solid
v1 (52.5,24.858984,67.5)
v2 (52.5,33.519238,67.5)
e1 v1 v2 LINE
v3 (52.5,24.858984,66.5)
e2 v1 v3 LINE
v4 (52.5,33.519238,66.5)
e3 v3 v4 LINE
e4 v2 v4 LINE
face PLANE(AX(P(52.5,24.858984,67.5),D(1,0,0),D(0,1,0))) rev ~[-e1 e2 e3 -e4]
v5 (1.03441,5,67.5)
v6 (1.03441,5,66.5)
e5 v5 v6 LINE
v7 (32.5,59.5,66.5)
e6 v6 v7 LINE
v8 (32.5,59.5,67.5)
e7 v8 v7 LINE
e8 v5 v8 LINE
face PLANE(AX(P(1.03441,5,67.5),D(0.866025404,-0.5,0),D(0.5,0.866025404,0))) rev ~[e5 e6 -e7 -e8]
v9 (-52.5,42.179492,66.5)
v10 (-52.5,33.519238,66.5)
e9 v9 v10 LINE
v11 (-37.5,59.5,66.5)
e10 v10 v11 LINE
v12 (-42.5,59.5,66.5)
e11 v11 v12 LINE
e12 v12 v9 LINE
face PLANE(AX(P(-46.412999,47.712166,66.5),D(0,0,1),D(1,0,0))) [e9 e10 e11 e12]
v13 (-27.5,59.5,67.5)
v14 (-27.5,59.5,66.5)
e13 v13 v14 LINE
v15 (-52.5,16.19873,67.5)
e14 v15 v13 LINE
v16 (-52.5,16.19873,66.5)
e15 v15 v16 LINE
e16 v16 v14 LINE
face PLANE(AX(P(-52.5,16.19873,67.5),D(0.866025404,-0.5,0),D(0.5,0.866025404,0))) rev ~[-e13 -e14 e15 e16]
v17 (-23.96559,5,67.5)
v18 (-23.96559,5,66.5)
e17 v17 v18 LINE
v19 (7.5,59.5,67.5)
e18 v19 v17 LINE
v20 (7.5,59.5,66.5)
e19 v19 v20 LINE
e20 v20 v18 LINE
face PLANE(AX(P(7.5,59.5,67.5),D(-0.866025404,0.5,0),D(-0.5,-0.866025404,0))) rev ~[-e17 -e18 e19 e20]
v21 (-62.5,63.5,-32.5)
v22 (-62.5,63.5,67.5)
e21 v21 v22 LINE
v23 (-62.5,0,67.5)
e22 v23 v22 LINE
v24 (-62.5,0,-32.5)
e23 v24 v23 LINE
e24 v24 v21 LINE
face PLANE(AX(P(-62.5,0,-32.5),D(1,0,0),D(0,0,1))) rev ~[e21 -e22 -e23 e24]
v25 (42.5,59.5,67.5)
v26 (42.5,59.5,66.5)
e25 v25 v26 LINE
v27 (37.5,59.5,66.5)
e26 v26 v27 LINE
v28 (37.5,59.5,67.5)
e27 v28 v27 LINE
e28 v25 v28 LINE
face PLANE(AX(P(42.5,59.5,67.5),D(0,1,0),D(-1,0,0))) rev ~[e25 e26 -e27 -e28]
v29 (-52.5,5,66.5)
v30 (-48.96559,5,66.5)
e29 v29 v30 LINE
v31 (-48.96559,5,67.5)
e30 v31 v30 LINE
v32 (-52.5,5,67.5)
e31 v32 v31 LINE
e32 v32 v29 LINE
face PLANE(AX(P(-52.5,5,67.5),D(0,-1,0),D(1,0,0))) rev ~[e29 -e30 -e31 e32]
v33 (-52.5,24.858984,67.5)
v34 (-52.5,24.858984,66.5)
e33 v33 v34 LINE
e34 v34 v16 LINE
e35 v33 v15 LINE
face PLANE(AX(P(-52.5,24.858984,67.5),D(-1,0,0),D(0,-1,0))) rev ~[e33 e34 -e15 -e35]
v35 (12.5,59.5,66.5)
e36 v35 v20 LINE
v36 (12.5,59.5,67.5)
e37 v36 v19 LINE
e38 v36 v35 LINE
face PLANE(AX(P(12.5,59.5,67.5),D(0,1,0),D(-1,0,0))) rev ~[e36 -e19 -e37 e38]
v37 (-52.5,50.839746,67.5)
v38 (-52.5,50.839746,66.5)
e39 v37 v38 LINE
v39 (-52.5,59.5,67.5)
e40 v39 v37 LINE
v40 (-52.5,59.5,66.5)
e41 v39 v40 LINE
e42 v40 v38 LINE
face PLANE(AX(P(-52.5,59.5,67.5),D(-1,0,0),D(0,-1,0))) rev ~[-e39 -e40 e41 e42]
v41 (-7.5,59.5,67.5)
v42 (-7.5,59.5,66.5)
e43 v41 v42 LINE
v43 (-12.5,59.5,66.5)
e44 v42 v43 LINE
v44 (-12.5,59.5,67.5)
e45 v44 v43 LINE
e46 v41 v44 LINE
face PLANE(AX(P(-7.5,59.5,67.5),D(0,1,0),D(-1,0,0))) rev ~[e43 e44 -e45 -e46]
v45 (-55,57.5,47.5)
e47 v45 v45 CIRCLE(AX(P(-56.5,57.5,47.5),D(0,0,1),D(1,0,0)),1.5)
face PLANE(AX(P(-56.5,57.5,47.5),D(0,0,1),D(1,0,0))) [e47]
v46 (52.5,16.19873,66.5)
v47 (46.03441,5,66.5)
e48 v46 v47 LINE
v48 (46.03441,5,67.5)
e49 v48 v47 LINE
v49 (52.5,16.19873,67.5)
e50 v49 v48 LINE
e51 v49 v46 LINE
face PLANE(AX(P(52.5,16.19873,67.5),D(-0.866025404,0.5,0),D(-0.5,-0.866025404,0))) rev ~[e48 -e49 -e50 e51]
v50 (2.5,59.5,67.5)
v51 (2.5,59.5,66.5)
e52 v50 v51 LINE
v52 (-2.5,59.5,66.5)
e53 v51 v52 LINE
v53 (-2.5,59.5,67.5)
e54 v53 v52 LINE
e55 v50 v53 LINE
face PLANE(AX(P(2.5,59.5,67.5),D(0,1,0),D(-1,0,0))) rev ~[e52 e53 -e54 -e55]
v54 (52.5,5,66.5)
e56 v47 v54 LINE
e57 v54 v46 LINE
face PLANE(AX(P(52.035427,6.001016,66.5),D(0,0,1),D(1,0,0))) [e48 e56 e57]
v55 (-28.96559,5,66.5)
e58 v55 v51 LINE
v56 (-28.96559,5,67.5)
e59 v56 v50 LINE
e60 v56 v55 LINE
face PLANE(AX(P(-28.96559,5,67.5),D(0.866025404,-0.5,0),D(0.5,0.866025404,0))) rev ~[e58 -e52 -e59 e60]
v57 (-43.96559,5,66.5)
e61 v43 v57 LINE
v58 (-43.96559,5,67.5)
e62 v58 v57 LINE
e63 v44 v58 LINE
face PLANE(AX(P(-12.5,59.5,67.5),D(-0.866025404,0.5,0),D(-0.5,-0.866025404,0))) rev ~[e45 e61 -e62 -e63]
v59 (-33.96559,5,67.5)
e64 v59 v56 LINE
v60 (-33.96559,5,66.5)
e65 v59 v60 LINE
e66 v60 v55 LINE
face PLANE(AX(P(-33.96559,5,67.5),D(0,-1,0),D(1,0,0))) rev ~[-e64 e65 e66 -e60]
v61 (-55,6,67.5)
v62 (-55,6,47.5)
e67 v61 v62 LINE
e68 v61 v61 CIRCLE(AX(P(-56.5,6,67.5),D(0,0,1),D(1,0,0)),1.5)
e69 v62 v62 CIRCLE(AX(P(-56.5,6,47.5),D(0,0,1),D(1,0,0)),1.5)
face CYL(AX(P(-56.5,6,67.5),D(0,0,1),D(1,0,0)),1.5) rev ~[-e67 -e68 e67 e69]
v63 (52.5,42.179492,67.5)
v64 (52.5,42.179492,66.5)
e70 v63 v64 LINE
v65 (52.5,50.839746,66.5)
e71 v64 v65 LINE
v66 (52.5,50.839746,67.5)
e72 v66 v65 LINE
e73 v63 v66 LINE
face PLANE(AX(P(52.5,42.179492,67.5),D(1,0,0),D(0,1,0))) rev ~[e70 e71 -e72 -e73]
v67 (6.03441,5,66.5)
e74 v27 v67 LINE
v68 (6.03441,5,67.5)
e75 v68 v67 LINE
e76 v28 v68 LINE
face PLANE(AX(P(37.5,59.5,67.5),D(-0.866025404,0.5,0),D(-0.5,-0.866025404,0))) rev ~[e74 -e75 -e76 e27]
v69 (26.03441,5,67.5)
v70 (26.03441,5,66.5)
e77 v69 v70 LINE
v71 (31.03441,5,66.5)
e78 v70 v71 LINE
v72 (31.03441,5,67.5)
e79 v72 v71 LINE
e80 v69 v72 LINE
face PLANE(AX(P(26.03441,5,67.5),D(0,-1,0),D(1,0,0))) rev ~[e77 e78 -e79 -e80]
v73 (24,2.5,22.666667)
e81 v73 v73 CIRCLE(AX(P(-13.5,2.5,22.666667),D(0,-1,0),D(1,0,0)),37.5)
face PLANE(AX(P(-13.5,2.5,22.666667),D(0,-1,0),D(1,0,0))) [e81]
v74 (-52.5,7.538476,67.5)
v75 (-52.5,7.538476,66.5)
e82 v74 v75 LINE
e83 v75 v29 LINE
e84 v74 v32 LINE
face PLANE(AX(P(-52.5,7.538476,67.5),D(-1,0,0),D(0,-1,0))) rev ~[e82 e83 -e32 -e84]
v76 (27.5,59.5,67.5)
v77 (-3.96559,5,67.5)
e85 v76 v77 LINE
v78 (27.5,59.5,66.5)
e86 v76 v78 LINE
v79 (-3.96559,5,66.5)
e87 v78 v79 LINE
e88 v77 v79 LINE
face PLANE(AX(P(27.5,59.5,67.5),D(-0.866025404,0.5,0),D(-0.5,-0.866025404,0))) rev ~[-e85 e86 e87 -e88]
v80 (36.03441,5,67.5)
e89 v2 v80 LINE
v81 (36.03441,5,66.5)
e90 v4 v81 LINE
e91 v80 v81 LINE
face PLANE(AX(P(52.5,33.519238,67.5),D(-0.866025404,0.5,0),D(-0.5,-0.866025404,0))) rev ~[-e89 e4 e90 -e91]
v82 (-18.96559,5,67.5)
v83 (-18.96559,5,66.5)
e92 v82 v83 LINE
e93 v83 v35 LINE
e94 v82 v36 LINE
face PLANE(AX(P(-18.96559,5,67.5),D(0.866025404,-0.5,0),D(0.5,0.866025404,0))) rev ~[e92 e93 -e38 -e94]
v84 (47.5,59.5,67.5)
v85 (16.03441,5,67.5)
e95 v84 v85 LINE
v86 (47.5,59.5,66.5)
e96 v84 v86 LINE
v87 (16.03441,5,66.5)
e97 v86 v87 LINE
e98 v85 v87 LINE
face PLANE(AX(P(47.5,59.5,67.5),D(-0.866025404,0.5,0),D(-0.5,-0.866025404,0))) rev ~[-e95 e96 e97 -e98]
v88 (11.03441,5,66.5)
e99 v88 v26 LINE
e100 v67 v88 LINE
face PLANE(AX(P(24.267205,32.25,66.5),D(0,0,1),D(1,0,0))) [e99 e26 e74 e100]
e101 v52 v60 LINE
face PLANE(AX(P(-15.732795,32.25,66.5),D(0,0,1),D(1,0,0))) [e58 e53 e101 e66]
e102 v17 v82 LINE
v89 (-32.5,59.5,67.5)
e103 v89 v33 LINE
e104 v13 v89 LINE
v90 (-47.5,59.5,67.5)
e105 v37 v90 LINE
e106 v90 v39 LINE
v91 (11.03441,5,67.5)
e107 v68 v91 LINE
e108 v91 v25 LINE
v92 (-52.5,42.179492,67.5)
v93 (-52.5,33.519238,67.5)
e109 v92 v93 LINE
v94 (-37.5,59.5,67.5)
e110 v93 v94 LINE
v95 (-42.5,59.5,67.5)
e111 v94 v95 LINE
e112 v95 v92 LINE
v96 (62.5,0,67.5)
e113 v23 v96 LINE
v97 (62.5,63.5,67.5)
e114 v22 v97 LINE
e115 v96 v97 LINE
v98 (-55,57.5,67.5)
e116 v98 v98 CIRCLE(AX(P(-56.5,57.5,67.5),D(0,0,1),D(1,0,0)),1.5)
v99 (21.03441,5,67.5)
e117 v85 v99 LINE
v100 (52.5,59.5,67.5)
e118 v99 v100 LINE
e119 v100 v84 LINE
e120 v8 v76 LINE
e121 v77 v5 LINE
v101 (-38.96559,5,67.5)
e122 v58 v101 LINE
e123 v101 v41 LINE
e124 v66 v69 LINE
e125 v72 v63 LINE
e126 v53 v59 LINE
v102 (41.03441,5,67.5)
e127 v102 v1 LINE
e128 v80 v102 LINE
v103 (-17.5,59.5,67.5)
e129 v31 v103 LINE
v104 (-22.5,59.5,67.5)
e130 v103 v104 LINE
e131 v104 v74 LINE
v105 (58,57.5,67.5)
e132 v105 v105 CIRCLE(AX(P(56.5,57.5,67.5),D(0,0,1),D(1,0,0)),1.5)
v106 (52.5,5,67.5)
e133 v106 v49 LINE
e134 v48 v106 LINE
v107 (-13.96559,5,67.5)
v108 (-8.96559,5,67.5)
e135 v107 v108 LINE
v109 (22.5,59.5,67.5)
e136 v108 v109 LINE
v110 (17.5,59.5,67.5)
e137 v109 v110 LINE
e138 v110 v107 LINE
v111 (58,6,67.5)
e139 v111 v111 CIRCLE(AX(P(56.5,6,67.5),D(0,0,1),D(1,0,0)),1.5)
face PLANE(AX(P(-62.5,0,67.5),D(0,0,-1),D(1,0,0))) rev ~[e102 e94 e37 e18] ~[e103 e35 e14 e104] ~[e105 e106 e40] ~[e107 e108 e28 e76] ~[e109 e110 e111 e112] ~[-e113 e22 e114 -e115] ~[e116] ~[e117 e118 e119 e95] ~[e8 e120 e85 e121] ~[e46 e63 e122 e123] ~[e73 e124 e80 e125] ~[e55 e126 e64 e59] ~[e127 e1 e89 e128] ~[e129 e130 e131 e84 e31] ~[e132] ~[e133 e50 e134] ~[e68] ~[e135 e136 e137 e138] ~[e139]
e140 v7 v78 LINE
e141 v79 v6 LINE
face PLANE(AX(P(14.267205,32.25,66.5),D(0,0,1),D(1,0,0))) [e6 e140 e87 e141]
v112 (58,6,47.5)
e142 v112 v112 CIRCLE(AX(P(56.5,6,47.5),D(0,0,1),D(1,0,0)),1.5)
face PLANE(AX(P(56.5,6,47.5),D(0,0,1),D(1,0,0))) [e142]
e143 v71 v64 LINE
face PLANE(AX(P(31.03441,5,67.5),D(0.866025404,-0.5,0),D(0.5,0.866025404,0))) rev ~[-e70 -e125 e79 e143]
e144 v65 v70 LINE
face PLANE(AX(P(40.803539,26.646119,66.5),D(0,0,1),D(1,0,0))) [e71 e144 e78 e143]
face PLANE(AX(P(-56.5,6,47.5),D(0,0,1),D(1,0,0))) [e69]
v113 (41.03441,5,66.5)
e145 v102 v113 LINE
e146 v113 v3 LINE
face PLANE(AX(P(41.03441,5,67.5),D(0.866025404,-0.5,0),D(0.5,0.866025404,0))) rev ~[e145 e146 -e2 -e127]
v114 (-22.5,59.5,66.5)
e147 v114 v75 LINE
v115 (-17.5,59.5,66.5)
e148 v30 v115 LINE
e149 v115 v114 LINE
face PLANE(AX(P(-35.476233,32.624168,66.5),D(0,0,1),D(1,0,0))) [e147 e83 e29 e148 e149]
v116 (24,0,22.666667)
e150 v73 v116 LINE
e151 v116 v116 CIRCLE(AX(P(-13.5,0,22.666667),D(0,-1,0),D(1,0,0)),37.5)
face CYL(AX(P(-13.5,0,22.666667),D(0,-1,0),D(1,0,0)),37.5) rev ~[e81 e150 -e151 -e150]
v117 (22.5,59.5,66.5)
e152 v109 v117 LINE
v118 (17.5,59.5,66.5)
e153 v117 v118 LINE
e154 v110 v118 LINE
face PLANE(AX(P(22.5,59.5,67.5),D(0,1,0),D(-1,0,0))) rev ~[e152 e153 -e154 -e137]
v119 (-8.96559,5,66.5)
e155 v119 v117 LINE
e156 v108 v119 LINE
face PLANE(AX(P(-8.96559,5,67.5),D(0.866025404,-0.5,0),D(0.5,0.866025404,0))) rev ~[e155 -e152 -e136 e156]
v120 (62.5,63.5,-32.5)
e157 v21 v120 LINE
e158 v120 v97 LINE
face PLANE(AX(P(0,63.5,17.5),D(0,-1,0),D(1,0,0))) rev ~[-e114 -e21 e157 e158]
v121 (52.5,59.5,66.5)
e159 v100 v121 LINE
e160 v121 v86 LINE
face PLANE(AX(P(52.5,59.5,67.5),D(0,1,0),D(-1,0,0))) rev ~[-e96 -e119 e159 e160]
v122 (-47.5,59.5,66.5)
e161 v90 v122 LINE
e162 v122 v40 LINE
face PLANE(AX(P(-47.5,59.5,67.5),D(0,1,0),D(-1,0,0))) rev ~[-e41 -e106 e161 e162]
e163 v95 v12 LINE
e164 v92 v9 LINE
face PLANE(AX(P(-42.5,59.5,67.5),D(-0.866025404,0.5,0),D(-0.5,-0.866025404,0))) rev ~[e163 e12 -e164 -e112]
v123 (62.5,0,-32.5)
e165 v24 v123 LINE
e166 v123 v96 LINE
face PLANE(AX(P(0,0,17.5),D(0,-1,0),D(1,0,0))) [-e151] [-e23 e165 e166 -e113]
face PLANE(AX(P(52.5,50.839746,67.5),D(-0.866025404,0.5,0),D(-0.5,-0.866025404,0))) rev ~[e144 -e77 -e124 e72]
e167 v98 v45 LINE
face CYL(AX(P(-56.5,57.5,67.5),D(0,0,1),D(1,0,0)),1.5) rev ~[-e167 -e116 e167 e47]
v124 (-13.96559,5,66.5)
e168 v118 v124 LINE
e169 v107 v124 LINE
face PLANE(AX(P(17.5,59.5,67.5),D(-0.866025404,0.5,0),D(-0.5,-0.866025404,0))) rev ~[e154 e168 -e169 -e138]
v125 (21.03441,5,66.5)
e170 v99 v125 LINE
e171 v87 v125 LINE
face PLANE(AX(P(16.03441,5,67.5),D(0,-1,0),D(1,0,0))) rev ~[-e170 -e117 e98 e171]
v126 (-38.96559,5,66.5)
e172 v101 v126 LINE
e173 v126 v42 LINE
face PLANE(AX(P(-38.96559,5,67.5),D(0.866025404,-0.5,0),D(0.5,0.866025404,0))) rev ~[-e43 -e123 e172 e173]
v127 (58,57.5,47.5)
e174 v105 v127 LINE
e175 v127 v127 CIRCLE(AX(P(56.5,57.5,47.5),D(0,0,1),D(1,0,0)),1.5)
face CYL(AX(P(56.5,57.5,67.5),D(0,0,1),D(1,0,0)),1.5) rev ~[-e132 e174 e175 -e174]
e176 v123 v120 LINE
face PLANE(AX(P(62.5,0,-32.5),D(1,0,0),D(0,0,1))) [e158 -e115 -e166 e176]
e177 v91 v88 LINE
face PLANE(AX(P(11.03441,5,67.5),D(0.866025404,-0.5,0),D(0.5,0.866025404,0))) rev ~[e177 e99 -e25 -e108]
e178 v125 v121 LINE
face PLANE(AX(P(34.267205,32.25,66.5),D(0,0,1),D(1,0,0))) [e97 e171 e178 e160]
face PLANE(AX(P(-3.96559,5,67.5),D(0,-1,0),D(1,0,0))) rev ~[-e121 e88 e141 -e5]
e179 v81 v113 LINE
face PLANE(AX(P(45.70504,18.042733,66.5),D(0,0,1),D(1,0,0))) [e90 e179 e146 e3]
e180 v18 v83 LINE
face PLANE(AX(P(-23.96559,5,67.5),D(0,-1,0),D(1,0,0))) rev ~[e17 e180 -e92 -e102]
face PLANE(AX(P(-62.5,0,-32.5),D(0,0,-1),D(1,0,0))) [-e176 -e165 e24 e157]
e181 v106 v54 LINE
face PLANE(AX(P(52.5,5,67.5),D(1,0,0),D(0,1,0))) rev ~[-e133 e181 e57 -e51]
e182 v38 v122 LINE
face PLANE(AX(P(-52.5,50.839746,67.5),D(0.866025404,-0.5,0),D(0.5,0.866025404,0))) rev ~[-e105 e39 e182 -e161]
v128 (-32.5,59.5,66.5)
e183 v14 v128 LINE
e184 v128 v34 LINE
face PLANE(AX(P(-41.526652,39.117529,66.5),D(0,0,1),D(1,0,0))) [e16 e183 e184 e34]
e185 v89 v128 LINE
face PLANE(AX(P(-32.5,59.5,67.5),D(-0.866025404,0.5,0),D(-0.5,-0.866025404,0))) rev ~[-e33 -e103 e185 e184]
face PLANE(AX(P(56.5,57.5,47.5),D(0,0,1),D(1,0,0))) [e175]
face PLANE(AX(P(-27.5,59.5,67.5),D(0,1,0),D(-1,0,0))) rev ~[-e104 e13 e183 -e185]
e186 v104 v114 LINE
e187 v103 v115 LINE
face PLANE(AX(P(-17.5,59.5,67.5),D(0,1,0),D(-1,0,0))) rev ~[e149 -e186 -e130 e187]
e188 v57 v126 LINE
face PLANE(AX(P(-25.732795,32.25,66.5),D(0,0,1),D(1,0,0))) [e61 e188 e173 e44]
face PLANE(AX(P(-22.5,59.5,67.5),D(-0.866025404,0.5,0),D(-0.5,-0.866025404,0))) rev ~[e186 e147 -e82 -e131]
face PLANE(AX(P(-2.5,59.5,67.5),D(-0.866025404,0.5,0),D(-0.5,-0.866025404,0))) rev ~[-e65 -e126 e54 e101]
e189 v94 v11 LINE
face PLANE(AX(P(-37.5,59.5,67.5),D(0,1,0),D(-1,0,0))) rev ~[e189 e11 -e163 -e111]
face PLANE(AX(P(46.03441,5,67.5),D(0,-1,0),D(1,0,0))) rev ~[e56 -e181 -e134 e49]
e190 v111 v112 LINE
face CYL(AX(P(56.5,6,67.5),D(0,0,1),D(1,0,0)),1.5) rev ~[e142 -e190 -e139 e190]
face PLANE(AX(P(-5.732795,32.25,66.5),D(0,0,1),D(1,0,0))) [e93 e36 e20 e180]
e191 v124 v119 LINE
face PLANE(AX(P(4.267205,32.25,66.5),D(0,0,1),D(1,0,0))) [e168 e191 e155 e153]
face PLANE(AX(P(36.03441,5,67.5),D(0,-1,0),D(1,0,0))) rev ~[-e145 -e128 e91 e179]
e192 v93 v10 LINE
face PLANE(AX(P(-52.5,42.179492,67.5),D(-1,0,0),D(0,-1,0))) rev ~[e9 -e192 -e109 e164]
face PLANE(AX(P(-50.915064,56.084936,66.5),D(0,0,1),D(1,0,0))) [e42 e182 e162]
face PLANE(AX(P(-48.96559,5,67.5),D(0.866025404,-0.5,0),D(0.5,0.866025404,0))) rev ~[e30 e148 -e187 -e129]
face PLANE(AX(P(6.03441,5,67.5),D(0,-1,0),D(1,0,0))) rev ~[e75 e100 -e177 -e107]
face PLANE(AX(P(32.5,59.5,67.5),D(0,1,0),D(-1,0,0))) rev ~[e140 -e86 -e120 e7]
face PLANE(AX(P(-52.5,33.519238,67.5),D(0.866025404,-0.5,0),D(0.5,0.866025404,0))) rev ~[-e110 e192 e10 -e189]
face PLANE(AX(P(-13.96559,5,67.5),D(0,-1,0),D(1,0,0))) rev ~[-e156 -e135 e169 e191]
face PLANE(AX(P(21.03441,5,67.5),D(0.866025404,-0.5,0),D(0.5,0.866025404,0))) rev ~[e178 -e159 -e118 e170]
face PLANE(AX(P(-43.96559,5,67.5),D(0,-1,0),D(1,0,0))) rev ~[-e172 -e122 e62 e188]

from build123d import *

# Parameters (mm, degrees)
F0_W     = 125
F0_H     = 100
F2_DEPTH = 63.5
F1_R     = 37.5
F3_DEPTH = 2.5
F5_DEPTH = 1
F6_R     = 1.5
F7_DEPTH = 20


# Not quite as in the source:
# - a feature names something its author has since deleted; it is built from what else it names


with BuildPart() as f2:
    # F0 (on Front) → F2 (new body)
    with BuildSketch(Plane.XZ):
        with Locations((0, 17.5)):
            Rectangle(F0_W, F0_H)
    extrude(amount=-F2_DEPTH)

    # F1 (on Front) → F3 (cut, symmetric)
    with BuildSketch(Plane.XZ):
        with Locations((-13.5, 22.6666666667)):
            Circle(F1_R)
    extrude(amount=F3_DEPTH, both=True, mode=Mode.SUBTRACT)

    # F4 (on face) → F5 (cut)
    with BuildSketch(Plane.XY.offset(67.5)):
        Polygon((51.0344103292, 5), (52.5, 5), (52.5, 7.5384757729), align=None)
        Polygon((46.0344103292, 5), (51.0344103292, 5), (52.5, 7.5384757729), (52.5, 16.1987298108), align=None)
        Polygon((36.0344103292, 5), (41.0344103292, 5), (52.5, 24.8589838486), (52.5, 33.5192378865), align=None)
        Polygon((26.0344103292, 5), (31.0344103292, 5), (52.5, 42.1794919243), (52.5, 50.8397459622), align=None)
        Polygon((16.0344103292, 5), (21.0344103292, 5), (52.5, 59.5), (47.5, 59.5), align=None)
        Polygon((-32.5, 59.5), (-52.5, 24.8589838486), (-52.5, 16.1987298108), (-27.5, 59.5), align=None)
        Polygon((6.0344103292, 5), (11.0344103292, 5), (42.5, 59.5), (37.5, 59.5), align=None)
        Polygon((-52.5, 42.1794919243), (-52.5, 33.5192378865), (-37.5, 59.5), (-42.5, 59.5), align=None)
        Polygon((-47.5, 59.5), (-52.5, 59.5), (-52.5, 50.8397459622), align=None)
        Polygon((-22.5, 59.5), (-52.5, 7.5384757729), (-52.5, 5), (-48.9655896708, 5), (-17.5, 59.5), align=None)
        Polygon((-3.9655896708, 5), (1.0344103292, 5), (32.5, 59.5), (27.5, 59.5), align=None)
        Polygon((-13.9655896708, 5), (-8.9655896708, 5), (22.5, 59.5), (17.5, 59.5), align=None)
        Polygon((-12.5, 59.5), (-43.9655896708, 5), (-38.9655896708, 5), (-7.5, 59.5), align=None)
        Polygon((-23.9655896708, 5), (-18.9655896708, 5), (12.5, 59.5), (7.5, 59.5), align=None)
        Polygon((-2.5, 59.5), (-33.9655896708, 5), (-28.9655896708, 5), (2.5, 59.5), align=None)
    extrude(amount=-F5_DEPTH, mode=Mode.SUBTRACT)

    # F6 (on face) → F7 (cut)
    with BuildSketch(Plane.XY.offset(67.5)):
        with Locations((-56.5, 57.5)):
            Circle(F6_R)
        with Locations((56.5, 57.5)):
            Circle(F6_R)
        with Locations((56.5, 6)):
            Circle(F6_R)
        with Locations((-56.5, 6)):
            Circle(F6_R)
    extrude(amount=-F7_DEPTH, mode=Mode.SUBTRACT)


solid = f2.part
